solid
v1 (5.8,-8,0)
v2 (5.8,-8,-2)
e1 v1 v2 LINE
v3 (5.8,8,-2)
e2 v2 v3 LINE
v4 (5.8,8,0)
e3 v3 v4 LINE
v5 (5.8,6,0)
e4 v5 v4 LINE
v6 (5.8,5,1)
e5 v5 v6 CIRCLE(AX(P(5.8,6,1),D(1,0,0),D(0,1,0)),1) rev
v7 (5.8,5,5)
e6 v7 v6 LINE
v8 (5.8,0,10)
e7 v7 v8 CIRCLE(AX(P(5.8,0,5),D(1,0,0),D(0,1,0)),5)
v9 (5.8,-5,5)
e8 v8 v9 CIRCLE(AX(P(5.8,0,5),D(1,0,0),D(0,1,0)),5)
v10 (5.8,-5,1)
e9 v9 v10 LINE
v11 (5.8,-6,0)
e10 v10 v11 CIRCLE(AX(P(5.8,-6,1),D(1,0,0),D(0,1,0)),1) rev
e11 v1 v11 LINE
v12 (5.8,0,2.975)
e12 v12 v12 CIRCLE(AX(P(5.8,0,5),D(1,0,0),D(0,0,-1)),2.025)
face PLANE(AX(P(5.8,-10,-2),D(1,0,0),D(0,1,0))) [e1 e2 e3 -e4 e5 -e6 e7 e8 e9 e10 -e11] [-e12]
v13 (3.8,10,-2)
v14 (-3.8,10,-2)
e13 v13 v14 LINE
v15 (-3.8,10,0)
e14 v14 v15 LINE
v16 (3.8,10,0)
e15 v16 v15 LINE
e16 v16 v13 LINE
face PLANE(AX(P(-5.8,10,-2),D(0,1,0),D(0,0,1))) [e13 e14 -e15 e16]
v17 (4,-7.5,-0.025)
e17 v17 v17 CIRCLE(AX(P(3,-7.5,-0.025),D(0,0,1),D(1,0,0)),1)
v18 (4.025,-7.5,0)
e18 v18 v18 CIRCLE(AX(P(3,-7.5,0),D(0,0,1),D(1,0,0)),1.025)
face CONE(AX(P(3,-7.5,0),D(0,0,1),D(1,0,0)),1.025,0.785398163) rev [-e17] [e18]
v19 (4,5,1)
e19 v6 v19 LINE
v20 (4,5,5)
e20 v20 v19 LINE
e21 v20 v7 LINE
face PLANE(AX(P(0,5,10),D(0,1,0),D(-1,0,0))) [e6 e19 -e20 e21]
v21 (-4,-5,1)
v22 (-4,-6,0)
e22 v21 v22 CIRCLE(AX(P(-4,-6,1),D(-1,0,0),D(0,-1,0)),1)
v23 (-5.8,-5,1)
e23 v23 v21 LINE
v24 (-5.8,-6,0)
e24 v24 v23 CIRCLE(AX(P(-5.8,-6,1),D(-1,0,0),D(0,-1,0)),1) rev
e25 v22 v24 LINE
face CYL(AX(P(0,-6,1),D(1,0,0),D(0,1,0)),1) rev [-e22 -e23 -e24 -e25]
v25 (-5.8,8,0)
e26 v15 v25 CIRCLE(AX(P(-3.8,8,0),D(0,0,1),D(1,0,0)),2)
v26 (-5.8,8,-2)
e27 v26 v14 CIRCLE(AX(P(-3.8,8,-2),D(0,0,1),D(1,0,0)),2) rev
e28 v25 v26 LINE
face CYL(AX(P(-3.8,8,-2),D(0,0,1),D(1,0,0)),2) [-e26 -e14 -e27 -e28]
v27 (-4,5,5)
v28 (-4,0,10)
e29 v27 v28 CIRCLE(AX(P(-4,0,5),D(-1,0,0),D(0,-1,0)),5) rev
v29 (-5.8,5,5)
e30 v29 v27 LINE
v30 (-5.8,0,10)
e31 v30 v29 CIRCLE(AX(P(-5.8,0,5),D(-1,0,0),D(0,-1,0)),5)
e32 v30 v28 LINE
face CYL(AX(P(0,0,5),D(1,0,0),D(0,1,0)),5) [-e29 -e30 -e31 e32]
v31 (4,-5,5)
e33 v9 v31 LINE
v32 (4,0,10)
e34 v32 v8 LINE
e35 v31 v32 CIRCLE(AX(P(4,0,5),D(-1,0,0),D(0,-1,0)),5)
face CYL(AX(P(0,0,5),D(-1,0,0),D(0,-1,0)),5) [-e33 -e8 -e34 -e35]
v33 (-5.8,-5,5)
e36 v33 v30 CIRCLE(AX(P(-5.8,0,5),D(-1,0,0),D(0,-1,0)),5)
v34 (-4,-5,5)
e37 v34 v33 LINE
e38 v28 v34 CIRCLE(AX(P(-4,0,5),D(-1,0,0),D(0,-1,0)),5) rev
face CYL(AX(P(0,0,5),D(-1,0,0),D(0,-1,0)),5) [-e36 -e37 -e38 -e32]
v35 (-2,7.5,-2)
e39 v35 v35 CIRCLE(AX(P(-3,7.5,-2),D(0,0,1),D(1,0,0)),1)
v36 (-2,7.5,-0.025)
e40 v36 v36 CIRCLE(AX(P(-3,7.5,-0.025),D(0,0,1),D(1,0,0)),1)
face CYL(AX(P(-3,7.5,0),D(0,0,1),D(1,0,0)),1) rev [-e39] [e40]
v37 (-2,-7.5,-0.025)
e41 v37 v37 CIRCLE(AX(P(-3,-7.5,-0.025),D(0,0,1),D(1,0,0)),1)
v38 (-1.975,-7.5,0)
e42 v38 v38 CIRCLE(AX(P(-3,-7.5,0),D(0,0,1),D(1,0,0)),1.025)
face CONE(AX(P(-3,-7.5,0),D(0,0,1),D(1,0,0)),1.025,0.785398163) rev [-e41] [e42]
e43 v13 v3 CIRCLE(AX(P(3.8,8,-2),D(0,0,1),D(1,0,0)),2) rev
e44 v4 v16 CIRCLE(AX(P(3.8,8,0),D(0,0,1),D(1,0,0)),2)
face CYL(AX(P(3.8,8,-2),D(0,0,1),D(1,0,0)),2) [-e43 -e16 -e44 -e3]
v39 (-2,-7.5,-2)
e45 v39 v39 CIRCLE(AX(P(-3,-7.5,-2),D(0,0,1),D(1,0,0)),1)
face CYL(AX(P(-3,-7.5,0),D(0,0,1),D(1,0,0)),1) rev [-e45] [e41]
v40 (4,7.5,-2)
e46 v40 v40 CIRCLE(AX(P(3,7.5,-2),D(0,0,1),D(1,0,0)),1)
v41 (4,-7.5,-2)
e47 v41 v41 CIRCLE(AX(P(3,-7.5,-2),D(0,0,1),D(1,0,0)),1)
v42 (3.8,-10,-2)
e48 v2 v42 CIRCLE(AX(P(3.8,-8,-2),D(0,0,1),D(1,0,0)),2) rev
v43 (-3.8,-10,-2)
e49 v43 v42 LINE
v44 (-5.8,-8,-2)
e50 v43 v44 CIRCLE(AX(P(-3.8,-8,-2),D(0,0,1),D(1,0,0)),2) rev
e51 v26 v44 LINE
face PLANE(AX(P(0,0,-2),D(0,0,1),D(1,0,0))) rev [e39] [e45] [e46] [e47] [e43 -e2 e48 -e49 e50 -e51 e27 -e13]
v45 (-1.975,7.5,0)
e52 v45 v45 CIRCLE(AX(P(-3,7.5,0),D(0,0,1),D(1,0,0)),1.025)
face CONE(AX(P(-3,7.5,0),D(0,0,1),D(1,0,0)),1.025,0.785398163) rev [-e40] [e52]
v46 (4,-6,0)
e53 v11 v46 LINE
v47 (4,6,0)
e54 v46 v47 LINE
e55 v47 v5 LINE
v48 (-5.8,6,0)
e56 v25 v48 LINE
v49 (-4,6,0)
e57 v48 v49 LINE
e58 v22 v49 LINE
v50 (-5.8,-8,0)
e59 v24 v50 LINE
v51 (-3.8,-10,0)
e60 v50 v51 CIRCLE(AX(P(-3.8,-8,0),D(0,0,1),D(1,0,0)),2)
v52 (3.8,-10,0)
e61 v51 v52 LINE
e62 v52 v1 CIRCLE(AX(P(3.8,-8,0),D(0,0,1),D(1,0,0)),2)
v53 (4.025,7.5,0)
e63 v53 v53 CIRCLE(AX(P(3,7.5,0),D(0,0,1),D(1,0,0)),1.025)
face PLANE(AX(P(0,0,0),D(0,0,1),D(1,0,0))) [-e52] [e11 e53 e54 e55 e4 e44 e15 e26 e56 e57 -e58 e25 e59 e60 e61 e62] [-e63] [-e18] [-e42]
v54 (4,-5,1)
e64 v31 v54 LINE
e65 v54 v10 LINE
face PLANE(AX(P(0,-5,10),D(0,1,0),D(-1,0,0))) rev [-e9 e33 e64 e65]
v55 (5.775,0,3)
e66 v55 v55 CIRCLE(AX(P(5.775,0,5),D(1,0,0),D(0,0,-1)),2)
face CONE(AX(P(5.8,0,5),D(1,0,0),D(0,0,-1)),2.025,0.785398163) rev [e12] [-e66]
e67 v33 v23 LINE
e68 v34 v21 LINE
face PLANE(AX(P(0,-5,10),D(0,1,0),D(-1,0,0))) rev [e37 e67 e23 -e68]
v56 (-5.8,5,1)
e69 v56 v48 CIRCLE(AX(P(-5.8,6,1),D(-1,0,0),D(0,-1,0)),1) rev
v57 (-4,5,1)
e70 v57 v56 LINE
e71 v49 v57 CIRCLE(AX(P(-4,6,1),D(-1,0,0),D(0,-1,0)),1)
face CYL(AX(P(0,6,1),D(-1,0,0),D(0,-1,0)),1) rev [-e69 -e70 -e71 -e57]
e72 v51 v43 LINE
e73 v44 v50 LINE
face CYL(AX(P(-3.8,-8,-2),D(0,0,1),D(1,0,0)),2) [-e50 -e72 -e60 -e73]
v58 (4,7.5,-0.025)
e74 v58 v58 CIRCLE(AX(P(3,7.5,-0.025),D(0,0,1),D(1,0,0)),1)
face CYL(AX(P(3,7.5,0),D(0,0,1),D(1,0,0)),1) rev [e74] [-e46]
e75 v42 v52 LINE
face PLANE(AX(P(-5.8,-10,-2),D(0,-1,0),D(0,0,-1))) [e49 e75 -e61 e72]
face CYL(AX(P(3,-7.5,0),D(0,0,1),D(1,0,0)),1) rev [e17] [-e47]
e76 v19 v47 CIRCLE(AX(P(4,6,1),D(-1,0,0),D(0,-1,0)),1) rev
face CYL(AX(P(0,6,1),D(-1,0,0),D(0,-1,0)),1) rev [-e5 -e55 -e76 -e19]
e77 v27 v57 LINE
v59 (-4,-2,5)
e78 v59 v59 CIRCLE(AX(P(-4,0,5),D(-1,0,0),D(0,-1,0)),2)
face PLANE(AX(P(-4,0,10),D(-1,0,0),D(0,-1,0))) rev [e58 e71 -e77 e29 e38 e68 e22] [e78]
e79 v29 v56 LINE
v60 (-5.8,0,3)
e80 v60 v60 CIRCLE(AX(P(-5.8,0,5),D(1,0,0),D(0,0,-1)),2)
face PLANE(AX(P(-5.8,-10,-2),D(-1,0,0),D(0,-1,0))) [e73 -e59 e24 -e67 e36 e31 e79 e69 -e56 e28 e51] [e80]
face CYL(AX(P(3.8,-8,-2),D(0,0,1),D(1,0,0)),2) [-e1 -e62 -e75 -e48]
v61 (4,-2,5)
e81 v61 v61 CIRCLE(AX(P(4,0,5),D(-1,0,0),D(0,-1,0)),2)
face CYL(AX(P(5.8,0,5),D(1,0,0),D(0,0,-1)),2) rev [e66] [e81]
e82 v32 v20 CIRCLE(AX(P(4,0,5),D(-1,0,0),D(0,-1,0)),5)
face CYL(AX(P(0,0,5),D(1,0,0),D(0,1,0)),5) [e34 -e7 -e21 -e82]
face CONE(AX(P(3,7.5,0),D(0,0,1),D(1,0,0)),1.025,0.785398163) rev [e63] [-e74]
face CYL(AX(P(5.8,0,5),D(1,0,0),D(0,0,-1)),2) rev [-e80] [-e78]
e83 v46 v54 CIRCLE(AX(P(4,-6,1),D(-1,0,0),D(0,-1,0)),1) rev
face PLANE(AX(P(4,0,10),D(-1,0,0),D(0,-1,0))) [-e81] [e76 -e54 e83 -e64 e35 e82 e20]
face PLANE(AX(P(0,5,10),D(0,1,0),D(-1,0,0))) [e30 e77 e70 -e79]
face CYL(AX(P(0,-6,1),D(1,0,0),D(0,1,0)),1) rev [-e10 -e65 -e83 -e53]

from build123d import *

# Parameters (mm, degrees)
SKETCH1_W                       = 20
SKETCH1_H                       = 11.6
BOSS_EXTRUDE1_DEPTH             = 2
SKETCH2_W                       = 10
SKETCH2_H                       = 1.8
BOSS_EXTRUDE2_DEPTH             = 10
FILLET1_R                       = 5
F_4_0MM_DOWEL_HOLE1_D           = 4
F_4_0MM_DOWEL_HOLE1_CSINK_D     = 4.05
F_4_0MM_DOWEL_HOLE1_CSINK_ANGLE = 90
F_2_0MM_DOWEL_HOLE1_D           = 2
F_2_0MM_DOWEL_HOLE1_CSINK_D     = 2.05
F_2_0MM_DOWEL_HOLE1_CSINK_ANGLE = 90
FILLET2_R                       = 2
FILLET3_R                       = 1


with BuildPart() as part:
    # Sketch1 → Boss-Extrude1 (new body)
    with BuildSketch(Plane(origin=(0, 0, 0), x_dir=(0, 1, 0), z_dir=(0, 0, 1))):
        Rectangle(SKETCH1_W, SKETCH1_H)
    extrude(amount=-BOSS_EXTRUDE1_DEPTH)

    # Sketch2 → Boss-Extrude2 (add)
    with BuildSketch(Plane(origin=(0, 0, 0), x_dir=(0, 1, 0), z_dir=(0, 0, 1))):
        with Locations((0, 4.9)):
            Rectangle(SKETCH2_W, SKETCH2_H)
        with Locations((0, -4.9)):
            Rectangle(SKETCH2_W, SKETCH2_H)
    extrude(amount=BOSS_EXTRUDE2_DEPTH)

    # Fillet1
    fillet1_edges = [part.edges().sort_by_distance(p)[0] for p in [
        (4.9, 5, 10),
        (4.9, -5, 10),
        (-4.9, 5, 10),
        (-4.9, -5, 10),
    ]]
    fillet(fillet1_edges, radius=FILLET1_R - 0.0001)  # a hair under: the kernel refuses the full size

    # Ø4.0mm Dowel Hole1 (through all)
    with Locations(Plane.YZ.offset(5.8)):
        with Locations((0, 5)):
            CounterSinkHole(F_4_0MM_DOWEL_HOLE1_D / 2, F_4_0MM_DOWEL_HOLE1_CSINK_D / 2, counter_sink_angle=F_4_0MM_DOWEL_HOLE1_CSINK_ANGLE)

    # Ø2.0mm Dowel Hole1 (through all)
    with Locations(Plane(origin=(0, 0, 0), x_dir=(0, 1, 0), z_dir=(0, 0, 1))):
        with Locations((7.5, -3), (-7.5, 3), (-7.5, -3), (7.5, 3)):
            CounterSinkHole(F_2_0MM_DOWEL_HOLE1_D / 2, F_2_0MM_DOWEL_HOLE1_CSINK_D / 2, counter_sink_angle=F_2_0MM_DOWEL_HOLE1_CSINK_ANGLE)

    # Fillet2
    fillet2_edges = [part.edges().sort_by_distance(p)[0] for p in [
        (-5.8, -10, -1),
        (-5.8, 10, -1),
        (5.8, 10, -1),
        (5.8, -10, -1),
    ]]
    fillet(fillet2_edges, radius=FILLET2_R)

    # Fillet3
    fillet3_edges = [part.edges().sort_by_distance(p)[0] for p in [
        (-4.9, -5, 0),
        (-4.9, 5, 0),
        (4.9, -5, 0),
        (4.9, 5, 0),
    ]]
    fillet(fillet3_edges, radius=FILLET3_R)


solid = part.part
